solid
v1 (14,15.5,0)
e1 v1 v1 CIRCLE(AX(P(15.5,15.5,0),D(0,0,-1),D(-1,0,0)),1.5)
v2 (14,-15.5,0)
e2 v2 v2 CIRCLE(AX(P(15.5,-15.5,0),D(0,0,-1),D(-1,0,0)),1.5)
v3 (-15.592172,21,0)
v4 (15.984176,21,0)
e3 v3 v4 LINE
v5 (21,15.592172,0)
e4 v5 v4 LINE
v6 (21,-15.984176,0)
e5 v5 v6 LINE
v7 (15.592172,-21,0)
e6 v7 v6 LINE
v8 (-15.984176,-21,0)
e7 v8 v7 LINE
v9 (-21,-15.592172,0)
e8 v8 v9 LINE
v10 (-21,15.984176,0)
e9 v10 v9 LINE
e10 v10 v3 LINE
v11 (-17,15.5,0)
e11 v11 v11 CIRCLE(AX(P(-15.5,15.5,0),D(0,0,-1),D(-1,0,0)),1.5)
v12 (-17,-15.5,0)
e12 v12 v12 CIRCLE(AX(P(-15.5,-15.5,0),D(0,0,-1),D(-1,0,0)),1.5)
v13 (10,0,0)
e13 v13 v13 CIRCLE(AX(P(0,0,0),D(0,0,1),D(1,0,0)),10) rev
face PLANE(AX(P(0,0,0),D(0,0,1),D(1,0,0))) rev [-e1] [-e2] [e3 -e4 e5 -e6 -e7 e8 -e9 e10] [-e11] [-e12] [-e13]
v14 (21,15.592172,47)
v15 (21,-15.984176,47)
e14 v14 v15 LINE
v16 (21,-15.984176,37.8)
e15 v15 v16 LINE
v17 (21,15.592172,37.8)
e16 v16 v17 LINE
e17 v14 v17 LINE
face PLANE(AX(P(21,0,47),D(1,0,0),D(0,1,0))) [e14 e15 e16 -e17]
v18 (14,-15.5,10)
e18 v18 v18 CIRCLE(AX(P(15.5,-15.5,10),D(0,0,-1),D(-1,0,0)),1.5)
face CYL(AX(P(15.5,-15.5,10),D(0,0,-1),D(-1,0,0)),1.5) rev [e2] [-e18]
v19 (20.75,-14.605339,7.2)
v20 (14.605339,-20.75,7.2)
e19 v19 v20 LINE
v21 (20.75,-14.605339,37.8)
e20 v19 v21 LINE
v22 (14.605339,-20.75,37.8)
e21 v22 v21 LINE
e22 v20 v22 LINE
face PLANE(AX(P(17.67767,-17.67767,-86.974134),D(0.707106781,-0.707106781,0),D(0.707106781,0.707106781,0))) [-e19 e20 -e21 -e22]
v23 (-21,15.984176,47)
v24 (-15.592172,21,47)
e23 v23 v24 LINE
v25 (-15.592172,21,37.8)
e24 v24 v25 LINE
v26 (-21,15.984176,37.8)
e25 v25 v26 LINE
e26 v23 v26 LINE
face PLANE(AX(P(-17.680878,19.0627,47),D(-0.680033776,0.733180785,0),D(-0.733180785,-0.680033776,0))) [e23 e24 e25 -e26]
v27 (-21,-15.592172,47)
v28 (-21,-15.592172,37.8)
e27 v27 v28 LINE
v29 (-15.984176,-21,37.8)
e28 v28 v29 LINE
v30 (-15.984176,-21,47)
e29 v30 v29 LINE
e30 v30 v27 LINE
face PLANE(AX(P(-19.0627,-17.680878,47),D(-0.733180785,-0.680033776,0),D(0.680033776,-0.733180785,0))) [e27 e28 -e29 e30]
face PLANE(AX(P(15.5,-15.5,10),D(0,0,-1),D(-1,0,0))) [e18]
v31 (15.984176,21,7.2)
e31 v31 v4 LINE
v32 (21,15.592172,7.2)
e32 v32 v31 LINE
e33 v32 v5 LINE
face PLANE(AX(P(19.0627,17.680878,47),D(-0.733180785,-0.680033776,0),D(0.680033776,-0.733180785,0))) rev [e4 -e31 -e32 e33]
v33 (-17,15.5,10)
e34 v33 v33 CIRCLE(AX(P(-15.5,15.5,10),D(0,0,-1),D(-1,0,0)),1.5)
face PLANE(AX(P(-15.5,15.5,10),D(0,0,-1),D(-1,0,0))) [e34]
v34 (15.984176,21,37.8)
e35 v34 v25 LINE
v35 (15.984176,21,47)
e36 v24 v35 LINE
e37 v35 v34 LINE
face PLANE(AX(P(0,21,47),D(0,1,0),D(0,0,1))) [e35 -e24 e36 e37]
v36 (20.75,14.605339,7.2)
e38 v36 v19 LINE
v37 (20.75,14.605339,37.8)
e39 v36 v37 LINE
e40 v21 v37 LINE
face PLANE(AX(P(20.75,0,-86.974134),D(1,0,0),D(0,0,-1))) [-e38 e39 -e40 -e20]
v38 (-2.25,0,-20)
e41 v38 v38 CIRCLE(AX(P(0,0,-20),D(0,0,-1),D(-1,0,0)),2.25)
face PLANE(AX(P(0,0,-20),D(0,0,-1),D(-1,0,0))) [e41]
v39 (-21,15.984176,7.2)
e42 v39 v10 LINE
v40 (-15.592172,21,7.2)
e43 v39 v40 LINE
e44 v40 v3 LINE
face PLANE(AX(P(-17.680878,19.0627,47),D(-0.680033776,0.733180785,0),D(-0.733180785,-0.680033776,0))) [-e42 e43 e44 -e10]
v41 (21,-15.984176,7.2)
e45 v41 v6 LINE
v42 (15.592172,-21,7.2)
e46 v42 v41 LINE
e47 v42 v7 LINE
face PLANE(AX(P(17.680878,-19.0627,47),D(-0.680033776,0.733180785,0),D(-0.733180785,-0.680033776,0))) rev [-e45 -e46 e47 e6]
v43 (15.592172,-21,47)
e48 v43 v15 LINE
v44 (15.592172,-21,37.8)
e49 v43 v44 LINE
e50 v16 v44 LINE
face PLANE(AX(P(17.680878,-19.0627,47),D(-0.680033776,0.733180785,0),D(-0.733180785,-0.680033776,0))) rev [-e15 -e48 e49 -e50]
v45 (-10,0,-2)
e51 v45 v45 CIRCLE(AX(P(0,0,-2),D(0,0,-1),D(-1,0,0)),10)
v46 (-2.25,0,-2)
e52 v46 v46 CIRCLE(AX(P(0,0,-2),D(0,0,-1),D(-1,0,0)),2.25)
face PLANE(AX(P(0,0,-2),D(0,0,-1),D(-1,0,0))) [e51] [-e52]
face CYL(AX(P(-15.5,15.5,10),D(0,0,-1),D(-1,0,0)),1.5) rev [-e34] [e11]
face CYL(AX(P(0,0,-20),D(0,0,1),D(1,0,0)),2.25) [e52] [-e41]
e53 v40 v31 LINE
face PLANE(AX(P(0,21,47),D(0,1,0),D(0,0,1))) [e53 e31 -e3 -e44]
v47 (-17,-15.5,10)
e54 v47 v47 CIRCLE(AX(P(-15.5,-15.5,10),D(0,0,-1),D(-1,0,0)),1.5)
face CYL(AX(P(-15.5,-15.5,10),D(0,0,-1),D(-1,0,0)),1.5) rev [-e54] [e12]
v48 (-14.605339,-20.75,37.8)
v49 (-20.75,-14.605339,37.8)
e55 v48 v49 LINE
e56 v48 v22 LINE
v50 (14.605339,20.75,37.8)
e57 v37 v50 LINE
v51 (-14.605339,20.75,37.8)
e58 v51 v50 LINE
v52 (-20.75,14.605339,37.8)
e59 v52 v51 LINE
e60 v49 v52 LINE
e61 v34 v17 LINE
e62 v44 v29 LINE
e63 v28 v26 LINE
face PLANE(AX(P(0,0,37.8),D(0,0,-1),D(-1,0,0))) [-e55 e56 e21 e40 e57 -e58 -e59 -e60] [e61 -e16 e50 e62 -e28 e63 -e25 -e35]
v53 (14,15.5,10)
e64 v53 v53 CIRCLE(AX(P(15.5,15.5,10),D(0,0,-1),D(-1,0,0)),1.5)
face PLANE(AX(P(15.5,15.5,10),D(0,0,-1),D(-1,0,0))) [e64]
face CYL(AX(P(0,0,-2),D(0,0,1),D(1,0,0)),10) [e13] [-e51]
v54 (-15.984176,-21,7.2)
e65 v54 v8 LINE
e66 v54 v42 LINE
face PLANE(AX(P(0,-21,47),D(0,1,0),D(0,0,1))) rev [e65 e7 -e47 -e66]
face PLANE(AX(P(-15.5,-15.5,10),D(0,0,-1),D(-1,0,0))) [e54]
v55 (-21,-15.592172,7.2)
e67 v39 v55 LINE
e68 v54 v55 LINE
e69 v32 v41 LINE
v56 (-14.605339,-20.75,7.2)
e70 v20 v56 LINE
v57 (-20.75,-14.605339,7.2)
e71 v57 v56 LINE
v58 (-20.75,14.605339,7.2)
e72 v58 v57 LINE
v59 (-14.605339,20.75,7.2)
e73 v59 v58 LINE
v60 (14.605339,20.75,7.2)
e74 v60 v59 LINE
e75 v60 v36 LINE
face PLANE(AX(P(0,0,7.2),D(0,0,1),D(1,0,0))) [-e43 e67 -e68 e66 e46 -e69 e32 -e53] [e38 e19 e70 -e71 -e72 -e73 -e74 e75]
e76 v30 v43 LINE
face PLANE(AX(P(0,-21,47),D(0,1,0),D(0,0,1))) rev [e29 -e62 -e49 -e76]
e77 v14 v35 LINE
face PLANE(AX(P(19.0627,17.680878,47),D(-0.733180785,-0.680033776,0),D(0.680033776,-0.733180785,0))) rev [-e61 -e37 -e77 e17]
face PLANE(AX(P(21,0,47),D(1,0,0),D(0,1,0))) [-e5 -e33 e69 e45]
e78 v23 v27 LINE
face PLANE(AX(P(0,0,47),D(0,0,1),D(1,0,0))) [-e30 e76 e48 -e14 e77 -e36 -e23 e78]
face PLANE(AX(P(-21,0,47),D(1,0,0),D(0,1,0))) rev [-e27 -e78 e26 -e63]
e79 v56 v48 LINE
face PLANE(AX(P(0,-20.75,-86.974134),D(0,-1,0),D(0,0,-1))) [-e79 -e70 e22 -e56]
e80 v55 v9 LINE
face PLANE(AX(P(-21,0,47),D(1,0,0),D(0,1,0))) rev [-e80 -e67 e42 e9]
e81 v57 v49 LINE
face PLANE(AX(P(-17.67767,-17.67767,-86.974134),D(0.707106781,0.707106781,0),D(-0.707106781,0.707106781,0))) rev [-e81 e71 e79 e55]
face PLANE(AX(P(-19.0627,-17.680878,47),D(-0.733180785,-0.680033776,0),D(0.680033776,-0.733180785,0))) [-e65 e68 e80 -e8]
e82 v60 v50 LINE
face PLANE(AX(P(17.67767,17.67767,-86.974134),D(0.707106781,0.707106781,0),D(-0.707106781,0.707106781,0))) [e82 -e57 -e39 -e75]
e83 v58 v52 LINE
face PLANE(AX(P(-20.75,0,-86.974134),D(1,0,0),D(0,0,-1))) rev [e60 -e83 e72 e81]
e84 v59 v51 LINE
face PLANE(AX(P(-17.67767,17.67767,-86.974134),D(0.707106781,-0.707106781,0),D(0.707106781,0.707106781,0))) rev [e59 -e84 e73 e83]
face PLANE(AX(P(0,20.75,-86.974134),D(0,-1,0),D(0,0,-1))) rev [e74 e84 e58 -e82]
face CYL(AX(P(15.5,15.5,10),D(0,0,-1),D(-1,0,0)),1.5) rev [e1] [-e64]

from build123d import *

# Parameters (mm, degrees)
RESSALTO_EXTRUS_O1_DEPTH   = 47
CORTE_EXTRUS_O_FINA1_START = -39.8
CORTE_EXTRUS_O_FINA1_DEPTH = 30.6
ESBO_O3_R                  = 2.25
RESSALTO_EXTRUS_O2_DEPTH   = 20
ESBO_O4_R                  = 10
RESSALTO_EXTRUS_O3_DEPTH   = 2
ESBO_O5_R                  = 1.5
CORTE_EXTRUS_O1_DEPTH      = 10


# Read off the part's stored shape, not the designer's step: Corte-Extrusão-Fina1
with BuildPart() as part:
    # Esboço1 → Ressalto-extrusão1 (new body)
    with BuildSketch(Plane.XY):
        Polygon((-21, -15.592171873), (-15.984175996, -21), (15.592171873, -21), (21, -15.984175996), (21, 15.592171873), (15.984175996, 21), (-15.592171873, 21), (-21, 15.984175996), align=None)
    extrude(amount=RESSALTO_EXTRUS_O1_DEPTH)

    # Corte-Extrusão-Fina1 outline → Corte-Extrusão-Fina1 (cut)
    with BuildSketch(Plane.XY.offset(47).offset(CORTE_EXTRUS_O_FINA1_START)):
        Polygon((15.592171873, -21), (21, -15.984175996), (21, 15.592171873), (15.984175996, 21), (-15.592171873, 21), (-21, 15.984175996), (-21, -15.592171873), (-15.984175996, -21), align=None)
        Polygon((14.605339059, 20.75), (20.75, 14.605339059), (20.75, -14.605339059), (14.605339059, -20.75), (-14.605339059, -20.75), (-20.75, -14.605339059), (-20.75, 14.605339059), (-14.605339059, 20.75), align=None, mode=Mode.SUBTRACT)
    extrude(amount=CORTE_EXTRUS_O_FINA1_DEPTH, mode=Mode.SUBTRACT)

    # Esboço3 → Ressalto-extrusão2 (add)
    with BuildSketch(Plane(origin=(0, 0, 0), x_dir=(-1, 0, 0), z_dir=(0, 0, -1))):
        with Locations(Location((0, 0, 0), (0, 0, 180))):
            Circle(ESBO_O3_R)
    extrude(amount=RESSALTO_EXTRUS_O2_DEPTH)

    # Esboço4 → Ressalto-extrusão3 (add)
    with BuildSketch(Plane(origin=(0, 0, 0), x_dir=(-1, 0, 0), z_dir=(0, 0, -1))):
        with Locations(Location((0, 0, 0), (0, 0, 180))):
            Circle(ESBO_O4_R)
    extrude(amount=RESSALTO_EXTRUS_O3_DEPTH)

    # Esboço5 → Corte-extrusão1 (cut)
    with BuildSketch(Plane(origin=(0, 0, 0), x_dir=(-1, 0, 0), z_dir=(0, 0, -1))):
        with Locations((15.5, -15.5)):
            Circle(ESBO_O5_R)
        with Locations((-15.5, -15.5)):
            Circle(ESBO_O5_R)
        with Locations((-15.5, 15.5)):
            Circle(ESBO_O5_R)
        with Locations((15.5, 15.5)):
            Circle(ESBO_O5_R)
    extrude(amount=-CORTE_EXTRUS_O1_DEPTH, mode=Mode.SUBTRACT)


solid = part.part
